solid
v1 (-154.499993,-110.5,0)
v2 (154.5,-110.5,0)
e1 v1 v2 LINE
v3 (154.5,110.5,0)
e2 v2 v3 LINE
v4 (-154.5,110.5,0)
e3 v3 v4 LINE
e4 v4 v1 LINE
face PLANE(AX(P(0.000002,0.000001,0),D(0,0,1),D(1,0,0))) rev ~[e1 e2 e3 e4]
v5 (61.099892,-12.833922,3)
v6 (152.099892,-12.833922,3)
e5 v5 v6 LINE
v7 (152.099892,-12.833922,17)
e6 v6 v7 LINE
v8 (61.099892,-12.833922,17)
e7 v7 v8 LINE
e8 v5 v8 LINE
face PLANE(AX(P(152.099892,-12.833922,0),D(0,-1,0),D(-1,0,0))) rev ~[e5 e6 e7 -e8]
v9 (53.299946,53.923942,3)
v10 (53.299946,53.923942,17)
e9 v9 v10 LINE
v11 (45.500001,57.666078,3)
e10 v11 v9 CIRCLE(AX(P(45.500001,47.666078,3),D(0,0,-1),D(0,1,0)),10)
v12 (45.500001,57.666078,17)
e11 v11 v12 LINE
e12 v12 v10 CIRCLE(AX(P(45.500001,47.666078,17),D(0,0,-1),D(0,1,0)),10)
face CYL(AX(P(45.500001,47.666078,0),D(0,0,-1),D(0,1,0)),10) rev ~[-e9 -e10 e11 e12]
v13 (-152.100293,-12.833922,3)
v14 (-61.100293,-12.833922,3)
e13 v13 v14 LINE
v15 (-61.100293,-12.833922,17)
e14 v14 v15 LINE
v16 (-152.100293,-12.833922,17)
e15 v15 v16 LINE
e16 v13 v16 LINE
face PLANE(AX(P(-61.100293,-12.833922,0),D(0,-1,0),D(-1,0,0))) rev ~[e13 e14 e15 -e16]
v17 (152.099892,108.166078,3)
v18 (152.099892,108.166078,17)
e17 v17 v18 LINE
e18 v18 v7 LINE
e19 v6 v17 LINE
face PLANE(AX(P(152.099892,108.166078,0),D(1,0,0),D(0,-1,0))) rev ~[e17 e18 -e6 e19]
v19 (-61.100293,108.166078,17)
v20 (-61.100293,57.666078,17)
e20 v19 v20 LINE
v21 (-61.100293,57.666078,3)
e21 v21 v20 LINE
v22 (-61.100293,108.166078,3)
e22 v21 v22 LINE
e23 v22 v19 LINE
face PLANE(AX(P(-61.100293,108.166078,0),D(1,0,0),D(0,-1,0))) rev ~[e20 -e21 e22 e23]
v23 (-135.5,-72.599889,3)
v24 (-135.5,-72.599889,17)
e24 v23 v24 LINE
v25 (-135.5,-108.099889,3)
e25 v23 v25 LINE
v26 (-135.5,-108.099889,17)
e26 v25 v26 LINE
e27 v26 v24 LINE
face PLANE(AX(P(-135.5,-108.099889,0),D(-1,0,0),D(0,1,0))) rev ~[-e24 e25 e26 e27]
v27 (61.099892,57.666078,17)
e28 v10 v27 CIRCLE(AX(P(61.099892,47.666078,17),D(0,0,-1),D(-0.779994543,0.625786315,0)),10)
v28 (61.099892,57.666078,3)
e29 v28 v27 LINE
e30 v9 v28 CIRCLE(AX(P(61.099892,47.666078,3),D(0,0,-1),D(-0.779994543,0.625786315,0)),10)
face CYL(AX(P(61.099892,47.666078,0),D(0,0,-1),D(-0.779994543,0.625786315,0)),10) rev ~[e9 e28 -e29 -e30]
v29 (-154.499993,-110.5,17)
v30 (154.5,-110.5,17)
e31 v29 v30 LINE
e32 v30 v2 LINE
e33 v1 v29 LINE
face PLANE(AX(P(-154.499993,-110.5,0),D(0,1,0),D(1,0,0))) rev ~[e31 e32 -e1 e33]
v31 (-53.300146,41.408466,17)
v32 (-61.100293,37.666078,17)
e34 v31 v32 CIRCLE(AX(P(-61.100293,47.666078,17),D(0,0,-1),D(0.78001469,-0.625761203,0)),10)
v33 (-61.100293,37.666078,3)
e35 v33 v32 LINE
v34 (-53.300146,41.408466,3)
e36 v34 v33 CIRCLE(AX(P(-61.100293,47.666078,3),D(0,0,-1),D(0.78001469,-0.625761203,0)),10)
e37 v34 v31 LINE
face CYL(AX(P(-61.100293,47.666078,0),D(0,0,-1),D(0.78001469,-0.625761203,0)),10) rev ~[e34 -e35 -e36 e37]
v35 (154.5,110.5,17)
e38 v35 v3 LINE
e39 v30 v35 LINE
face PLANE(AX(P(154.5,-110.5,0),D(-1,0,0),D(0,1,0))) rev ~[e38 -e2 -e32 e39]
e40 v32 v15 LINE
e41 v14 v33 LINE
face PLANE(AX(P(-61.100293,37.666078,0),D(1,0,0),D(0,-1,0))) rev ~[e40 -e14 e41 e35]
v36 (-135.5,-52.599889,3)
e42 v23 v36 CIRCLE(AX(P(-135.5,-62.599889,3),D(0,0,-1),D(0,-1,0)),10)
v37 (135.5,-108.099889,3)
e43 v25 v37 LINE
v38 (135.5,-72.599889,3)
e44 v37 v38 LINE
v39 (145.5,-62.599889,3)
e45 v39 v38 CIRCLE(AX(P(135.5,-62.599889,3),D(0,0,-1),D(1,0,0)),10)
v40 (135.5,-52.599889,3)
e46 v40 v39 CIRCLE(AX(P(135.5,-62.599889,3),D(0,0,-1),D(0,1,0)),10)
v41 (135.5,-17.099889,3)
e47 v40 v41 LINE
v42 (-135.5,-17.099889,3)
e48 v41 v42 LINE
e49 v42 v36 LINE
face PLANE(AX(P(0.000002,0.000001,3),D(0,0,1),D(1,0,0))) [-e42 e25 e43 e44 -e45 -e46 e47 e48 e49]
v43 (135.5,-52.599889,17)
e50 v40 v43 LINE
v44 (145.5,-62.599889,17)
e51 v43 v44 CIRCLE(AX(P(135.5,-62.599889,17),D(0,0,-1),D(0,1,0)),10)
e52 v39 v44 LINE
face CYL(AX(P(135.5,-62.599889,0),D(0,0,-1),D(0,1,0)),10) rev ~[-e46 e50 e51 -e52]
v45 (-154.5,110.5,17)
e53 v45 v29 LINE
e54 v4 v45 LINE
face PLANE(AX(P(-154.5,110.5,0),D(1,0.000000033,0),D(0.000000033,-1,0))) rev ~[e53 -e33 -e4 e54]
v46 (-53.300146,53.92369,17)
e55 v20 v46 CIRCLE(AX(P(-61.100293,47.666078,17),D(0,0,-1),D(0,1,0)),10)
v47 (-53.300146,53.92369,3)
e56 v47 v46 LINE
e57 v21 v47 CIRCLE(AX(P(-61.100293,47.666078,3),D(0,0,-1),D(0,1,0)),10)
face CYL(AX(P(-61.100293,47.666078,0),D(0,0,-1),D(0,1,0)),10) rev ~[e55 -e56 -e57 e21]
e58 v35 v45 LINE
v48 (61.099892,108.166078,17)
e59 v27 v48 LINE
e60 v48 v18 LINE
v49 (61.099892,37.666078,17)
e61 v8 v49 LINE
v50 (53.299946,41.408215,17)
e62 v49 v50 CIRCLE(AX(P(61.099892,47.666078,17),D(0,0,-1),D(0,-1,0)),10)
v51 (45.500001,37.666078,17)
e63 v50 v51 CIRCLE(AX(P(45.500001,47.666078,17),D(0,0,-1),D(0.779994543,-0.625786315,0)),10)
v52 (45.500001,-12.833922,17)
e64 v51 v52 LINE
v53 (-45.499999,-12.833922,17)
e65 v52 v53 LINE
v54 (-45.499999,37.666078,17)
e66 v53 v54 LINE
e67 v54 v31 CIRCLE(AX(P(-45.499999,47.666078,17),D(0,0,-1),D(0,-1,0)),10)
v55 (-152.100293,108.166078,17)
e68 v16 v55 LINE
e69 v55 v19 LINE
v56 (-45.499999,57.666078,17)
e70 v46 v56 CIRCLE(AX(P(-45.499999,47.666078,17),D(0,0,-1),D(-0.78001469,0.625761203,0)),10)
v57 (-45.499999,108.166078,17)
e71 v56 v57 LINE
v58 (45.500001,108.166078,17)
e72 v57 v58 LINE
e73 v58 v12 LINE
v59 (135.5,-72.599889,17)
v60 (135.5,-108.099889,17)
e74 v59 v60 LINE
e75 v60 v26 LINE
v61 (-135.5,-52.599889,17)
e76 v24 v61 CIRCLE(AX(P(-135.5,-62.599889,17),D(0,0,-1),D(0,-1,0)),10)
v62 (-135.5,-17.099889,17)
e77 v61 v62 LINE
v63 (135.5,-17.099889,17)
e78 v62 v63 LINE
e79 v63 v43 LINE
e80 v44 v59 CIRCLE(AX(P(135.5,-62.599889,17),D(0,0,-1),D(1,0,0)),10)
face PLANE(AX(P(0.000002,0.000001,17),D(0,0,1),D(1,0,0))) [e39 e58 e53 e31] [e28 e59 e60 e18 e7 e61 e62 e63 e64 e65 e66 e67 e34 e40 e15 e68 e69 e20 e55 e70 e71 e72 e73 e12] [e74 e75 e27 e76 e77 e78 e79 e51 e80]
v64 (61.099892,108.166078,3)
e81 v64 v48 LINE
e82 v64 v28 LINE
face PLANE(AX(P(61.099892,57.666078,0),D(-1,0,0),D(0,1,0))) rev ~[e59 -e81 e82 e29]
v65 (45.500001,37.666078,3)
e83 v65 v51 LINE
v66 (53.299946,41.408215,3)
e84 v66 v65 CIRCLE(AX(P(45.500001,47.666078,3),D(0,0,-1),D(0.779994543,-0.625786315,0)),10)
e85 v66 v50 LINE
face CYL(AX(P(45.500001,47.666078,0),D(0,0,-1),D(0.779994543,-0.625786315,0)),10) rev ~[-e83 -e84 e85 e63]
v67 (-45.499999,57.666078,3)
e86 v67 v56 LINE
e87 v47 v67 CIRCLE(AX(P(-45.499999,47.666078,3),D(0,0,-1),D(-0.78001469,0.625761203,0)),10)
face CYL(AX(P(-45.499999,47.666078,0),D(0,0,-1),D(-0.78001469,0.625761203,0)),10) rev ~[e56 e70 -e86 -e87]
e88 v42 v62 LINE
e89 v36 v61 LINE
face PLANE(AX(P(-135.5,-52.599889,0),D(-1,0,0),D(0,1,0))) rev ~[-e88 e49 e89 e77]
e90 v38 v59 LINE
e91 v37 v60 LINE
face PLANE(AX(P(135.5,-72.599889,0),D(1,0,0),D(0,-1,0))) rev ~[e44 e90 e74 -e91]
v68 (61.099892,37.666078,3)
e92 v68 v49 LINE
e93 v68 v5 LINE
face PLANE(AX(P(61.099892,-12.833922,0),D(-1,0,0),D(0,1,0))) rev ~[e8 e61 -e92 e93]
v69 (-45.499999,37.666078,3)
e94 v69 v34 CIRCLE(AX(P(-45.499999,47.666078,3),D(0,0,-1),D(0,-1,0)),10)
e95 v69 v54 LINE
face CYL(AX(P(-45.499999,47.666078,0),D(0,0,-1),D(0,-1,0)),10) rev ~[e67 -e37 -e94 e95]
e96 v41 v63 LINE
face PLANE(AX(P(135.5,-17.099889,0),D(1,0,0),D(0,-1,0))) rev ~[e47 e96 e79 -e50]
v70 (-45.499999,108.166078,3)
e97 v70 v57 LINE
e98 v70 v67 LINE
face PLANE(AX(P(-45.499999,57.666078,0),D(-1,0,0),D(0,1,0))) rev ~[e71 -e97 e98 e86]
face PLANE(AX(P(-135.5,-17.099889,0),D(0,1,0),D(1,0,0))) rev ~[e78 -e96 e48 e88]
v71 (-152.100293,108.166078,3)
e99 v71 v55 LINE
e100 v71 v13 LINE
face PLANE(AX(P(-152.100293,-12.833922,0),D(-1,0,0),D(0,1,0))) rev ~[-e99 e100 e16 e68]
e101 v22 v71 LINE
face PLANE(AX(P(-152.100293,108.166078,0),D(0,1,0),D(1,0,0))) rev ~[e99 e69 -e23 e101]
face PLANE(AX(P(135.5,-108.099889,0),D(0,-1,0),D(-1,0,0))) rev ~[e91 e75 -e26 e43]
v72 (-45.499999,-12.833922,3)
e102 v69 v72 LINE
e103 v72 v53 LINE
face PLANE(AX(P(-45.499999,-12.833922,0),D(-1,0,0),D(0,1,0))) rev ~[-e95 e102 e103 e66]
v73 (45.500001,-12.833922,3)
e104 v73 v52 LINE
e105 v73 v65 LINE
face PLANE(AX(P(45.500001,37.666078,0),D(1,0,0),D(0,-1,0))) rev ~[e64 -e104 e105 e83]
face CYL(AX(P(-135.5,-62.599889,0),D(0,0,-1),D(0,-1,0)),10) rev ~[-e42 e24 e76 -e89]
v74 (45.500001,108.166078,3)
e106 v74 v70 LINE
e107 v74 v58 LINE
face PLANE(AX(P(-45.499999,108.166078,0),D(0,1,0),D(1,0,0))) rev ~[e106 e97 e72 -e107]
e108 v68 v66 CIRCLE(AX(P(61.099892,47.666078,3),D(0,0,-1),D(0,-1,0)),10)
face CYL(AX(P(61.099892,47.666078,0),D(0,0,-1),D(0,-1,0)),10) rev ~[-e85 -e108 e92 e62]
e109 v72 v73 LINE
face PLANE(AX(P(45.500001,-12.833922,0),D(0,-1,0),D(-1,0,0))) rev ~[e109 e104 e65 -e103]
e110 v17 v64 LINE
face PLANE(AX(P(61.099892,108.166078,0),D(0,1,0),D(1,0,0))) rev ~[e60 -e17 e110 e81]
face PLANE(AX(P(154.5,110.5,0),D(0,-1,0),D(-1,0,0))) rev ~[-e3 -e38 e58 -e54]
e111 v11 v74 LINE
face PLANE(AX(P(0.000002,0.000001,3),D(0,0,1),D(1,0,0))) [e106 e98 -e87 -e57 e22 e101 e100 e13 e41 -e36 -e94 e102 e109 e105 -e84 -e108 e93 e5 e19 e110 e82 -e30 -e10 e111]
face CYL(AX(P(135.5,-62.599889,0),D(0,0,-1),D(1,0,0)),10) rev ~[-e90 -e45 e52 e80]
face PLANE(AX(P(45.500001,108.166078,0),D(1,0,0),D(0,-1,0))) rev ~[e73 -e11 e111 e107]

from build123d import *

# Parameters (mm, degrees)
F1_DEPTH = 3
F2_DEPTH = 17


# Not quite as in the source:
# - ends of sketch curves that miss each other by under 0.0002 mm in the source are joined


with BuildPart() as f1:
    # F0 (on Top) → F1 (new body)
    with BuildSketch(Plane.XY):
        Polygon((154.5, 110.5), (-154.5, 110.5), (-154.4999927282, -110.5), (154.5, -110.5), align=None)
        with BuildLine():
            Line((135.5, -108.0998892117), (-135.5, -108.0998892117))
            Line((-135.5, -108.0998892117), (-135.5, -72.5998892117))
            ThreePointArc((-135.5, -72.5998892117), (-145.5, -62.5998892117), (-135.5, -52.5998892117))
            Line((-135.5, -52.5998892117), (-135.5, -17.0998892117))
            Line((-135.5, -17.0998892117), (135.5, -17.0998892117))
            Line((135.5, -17.0998892117), (135.5, -52.5998892117))
            ThreePointArc((135.5, -52.5998892117), (142.5710678119, -55.5288213998), (145.5, -62.5998892117))
            ThreePointArc((145.5, -62.5998892117), (142.5710678119, -69.6709570235), (135.5, -72.5998892117))
            Line((135.5, -72.5998892117), (135.5, -108.0998892117))
        make_face(mode=Mode.SUBTRACT)
        with BuildLine():
            Line((-45.4999990761, 57.6660784096), (-45.4999990761, 108.1660784096))
            Line((-45.4999990761, 108.1660784096), (45.5000009239, 108.1660784096))
            Line((45.5000009239, 108.1660784096), (45.5000009239, 57.6660784096))
            ThreePointArc((45.5000009239, 57.6660784096), (49.8255857676, 56.6821371804), (53.2999463577, 53.9239415616))
            ThreePointArc((53.2999463577, 53.9239415616), (56.7743069478, 56.6821371804), (61.0998917915, 57.6660784096))
            Line((61.0998917915, 57.6660784096), (61.0998917915, 108.1660784096))
            Line((61.0998917915, 108.1660784096), (152.0998917915, 108.1660784096))
            Line((152.0998917915, 108.1660784096), (152.0998917915, -12.8339215904))
            Line((152.0998917915, -12.8339215904), (61.0998917915, -12.8339215904))
            Line((61.0998917915, -12.8339215904), (61.0998917915, 37.6660784096))
            ThreePointArc((61.0998917915, 37.6660784096), (56.7743069478, 38.6500196387), (53.2999463577, 41.4082152575))
            ThreePointArc((53.2999463577, 41.4082152575), (49.8255857676, 38.6500196387), (45.5000009239, 37.6660784096))
            Line((45.5000009239, 37.6660784096), (45.5000009239, -12.8339215904))
            Line((45.5000009239, -12.8339215904), (-45.4999990761, -12.8339215904))
            Line((-45.4999990761, -12.8339215904), (-45.4999990761, 37.6660784096))
            ThreePointArc((-45.4999990761, 37.6660784096), (-49.8257290565, 38.6500892715), (-53.3001459795, 41.4084663822))
            ThreePointArc((-53.3001459795, 41.4084663822), (-56.7745629026, 38.6500892715), (-61.1002928829, 37.6660784096))
            Line((-61.1002928829, 37.6660784096), (-61.1002928829, -12.8339215904))
            Line((-61.1002928829, -12.8339215904), (-152.1002928829, -12.8339215904))
            Line((-152.1002928829, -12.8339215904), (-152.1002928829, 108.1660784096))
            Line((-152.1002928829, 108.1660784096), (-61.1002928829, 108.1660784096))
            Line((-61.1002928829, 108.1660784096), (-61.1002928829, 57.6660784096))
            ThreePointArc((-61.1002928829, 57.6660784096), (-56.7745629026, 56.6820675476), (-53.3001459795, 53.923690437))
            ThreePointArc((-53.3001459795, 53.923690437), (-49.8257290565, 56.6820675476), (-45.4999990761, 57.6660784096))
        make_face(mode=Mode.SUBTRACT)
        with BuildLine():
            Line((-135.5, -72.5998892117), (-135.5, -108.0998892117))
            Line((-135.5, -108.0998892117), (135.5, -108.0998892117))
            Line((135.5, -108.0998892117), (135.5, -72.5998892117))
            ThreePointArc((135.5, -72.5998892117), (125.5, -62.5998892117), (135.5, -52.5998892117))
            Line((135.5, -52.5998892117), (135.5, -17.0998892117))
            Line((135.5, -17.0998892117), (-135.5, -17.0998892117))
            Line((-135.5, -17.0998892117), (-135.5, -52.5998892117))
            ThreePointArc((-135.5, -52.5998892117), (-128.4289321881, -55.5288213998), (-125.5, -62.5998892117))
            ThreePointArc((-125.5, -62.5998892117), (-128.4289321881, -69.6709570235), (-135.5, -72.5998892117))
        make_face()
        with BuildLine():
            ThreePointArc((-61.1002928829, 37.6660784096), (-71.1002928829, 47.6660784096), (-61.1002928829, 57.6660784096))
            Line((-61.1002928829, 57.6660784096), (-61.1002928829, 108.1660784096))
            Line((-61.1002928829, 108.1660784096), (-152.1002928829, 108.1660784096))
            Line((-152.1002928829, 108.1660784096), (-152.1002928829, -12.8339215904))
            Line((-152.1002928829, -12.8339215904), (-61.1002928829, -12.8339215904))
            Line((-61.1002928829, -12.8339215904), (-61.1002928829, 37.6660784096))
        make_face()
        with BuildLine():
            Line((61.0998917915, 108.1660784096), (61.0998917915, 57.6660784096))
            ThreePointArc((61.0998917915, 57.6660784096), (68.1709596034, 54.7371462214), (71.0998917915, 47.6660784096))
            ThreePointArc((71.0998917915, 47.6660784096), (68.1709596034, 40.5950105977), (61.0998917915, 37.6660784096))
            Line((61.0998917915, 37.6660784096), (61.0998917915, -12.8339215904))
            Line((61.0998917915, -12.8339215904), (152.0998917915, -12.8339215904))
            Line((152.0998917915, -12.8339215904), (152.0998917915, 108.1660784096))
            Line((152.0998917915, 108.1660784096), (61.0998917915, 108.1660784096))
        make_face()
        with BuildLine():
            Line((45.5000009239, 108.1660784096), (-45.4999990761, 108.1660784096))
            Line((-45.4999990761, 108.1660784096), (-45.4999990761, 57.6660784096))
            ThreePointArc((-45.4999990761, 57.6660784096), (-38.4289312643, 54.7371462214), (-35.4999990761, 47.6660784096))
            ThreePointArc((-35.4999990761, 47.6660784096), (-38.4289312643, 40.5950105977), (-45.4999990761, 37.6660784096))
            Line((-45.4999990761, 37.6660784096), (-45.4999990761, -12.8339215904))
            Line((-45.4999990761, -12.8339215904), (45.5000009239, -12.8339215904))
            Line((45.5000009239, -12.8339215904), (45.5000009239, 37.6660784096))
            ThreePointArc((45.5000009239, 37.6660784096), (35.5000009239, 47.6660784096), (45.5000009239, 57.6660784096))
            Line((45.5000009239, 57.6660784096), (45.5000009239, 108.1660784096))
        make_face()
        with BuildLine():
            Line((-61.1002928829, 37.6660784096), (-61.1002928829, 57.6660784096))
            ThreePointArc((-61.1002928829, 57.6660784096), (-71.1002928829, 47.6660784096), (-61.1002928829, 37.6660784096))
        make_face()
        with BuildLine():
            Line((45.5000009239, 37.6660784096), (45.5000009239, 57.6660784096))
            ThreePointArc((45.5000009239, 57.6660784096), (35.5000009239, 47.6660784096), (45.5000009239, 37.6660784096))
        make_face()
        with BuildLine():
            ThreePointArc((71.0998917915, 47.6660784096), (68.1709596034, 54.7371462214), (61.0998917915, 57.6660784096))
            Line((61.0998917915, 57.6660784096), (61.0998917915, 37.6660784096))
            ThreePointArc((61.0998917915, 37.6660784096), (68.1709596034, 40.5950105977), (71.0998917915, 47.6660784096))
        make_face()
        with BuildLine():
            Line((135.5, -52.5998892117), (135.5, -72.5998892117))
            ThreePointArc((135.5, -72.5998892117), (142.5710678119, -69.6709570235), (145.5, -62.5998892117))
            ThreePointArc((145.5, -62.5998892117), (142.5710678119, -55.5288213998), (135.5, -52.5998892117))
        make_face()
        with BuildLine():
            ThreePointArc((-35.4999990761, 47.6660784096), (-38.4289312643, 54.7371462214), (-45.4999990761, 57.6660784096))
            Line((-45.4999990761, 57.6660784096), (-45.4999990761, 37.6660784096))
            ThreePointArc((-45.4999990761, 37.6660784096), (-38.4289312643, 40.5950105977), (-35.4999990761, 47.6660784096))
        make_face()
        with BuildLine():
            ThreePointArc((135.5, -52.5998892117), (125.5, -62.5998892117), (135.5, -72.5998892117))
            Line((135.5, -72.5998892117), (135.5, -52.5998892117))
        make_face()
        with BuildLine():
            Line((-135.5, -52.5998892117), (-135.5, -72.5998892117))
            ThreePointArc((-135.5, -72.5998892117), (-128.4289321881, -69.6709570235), (-125.5, -62.5998892117))
            ThreePointArc((-125.5, -62.5998892117), (-128.4289321881, -55.5288213998), (-135.5, -52.5998892117))
        make_face()
        with BuildLine():
            ThreePointArc((-135.5, -52.5998892117), (-145.5, -62.5998892117), (-135.5, -72.5998892117))
            Line((-135.5, -72.5998892117), (-135.5, -52.5998892117))
        make_face()
        with BuildLine():
            Line((-45.4999990761, 37.6660784096), (-45.4999990761, 57.6660784096))
            ThreePointArc((-45.4999990761, 57.6660784096), (-49.8257290565, 56.6820675476), (-53.3001459795, 53.923690437))
            ThreePointArc((-53.3001459795, 53.923690437), (-51.6662728216, 50.9825924655), (-51.1002928829, 47.6660784096))
            ThreePointArc((-51.1002928829, 47.6660784096), (-51.6662728216, 44.3495643536), (-53.3001459795, 41.4084663822))
            ThreePointArc((-53.3001459795, 41.4084663822), (-49.8257290565, 38.6500892715), (-45.4999990761, 37.6660784096))
        make_face()
        with BuildLine():
            ThreePointArc((-53.3001459795, 41.4084663822), (-55.4999990761, 47.6660784096), (-53.3001459795, 53.923690437))
            ThreePointArc((-53.3001459795, 53.923690437), (-56.7745629026, 56.6820675476), (-61.1002928829, 57.6660784096))
            Line((-61.1002928829, 57.6660784096), (-61.1002928829, 37.6660784096))
            ThreePointArc((-61.1002928829, 37.6660784096), (-56.7745629026, 38.6500892715), (-53.3001459795, 41.4084663822))
        make_face()
        with BuildLine():
            ThreePointArc((61.0998917915, 57.6660784096), (56.7743069478, 56.6821371804), (53.2999463577, 53.9239415616))
            ThreePointArc((53.2999463577, 53.9239415616), (54.9339675959, 50.9827443305), (55.5000009239, 47.6660784096))
            ThreePointArc((55.5000009239, 47.6660784096), (54.9339675959, 44.3494124887), (53.2999463577, 41.4082152575))
            ThreePointArc((53.2999463577, 41.4082152575), (56.7743069478, 38.6500196387), (61.0998917915, 37.6660784096))
            Line((61.0998917915, 37.6660784096), (61.0998917915, 57.6660784096))
        make_face()
        with BuildLine():
            ThreePointArc((53.2999463577, 53.9239415616), (49.8255857676, 56.6821371804), (45.5000009239, 57.6660784096))
            Line((45.5000009239, 57.6660784096), (45.5000009239, 37.6660784096))
            ThreePointArc((45.5000009239, 37.6660784096), (49.8255857676, 38.6500196387), (53.2999463577, 41.4082152575))
            ThreePointArc((53.2999463577, 41.4082152575), (51.0998917915, 47.6660784096), (53.2999463577, 53.9239415616))
        make_face()
        with BuildLine():
            ThreePointArc((55.5000009239, 47.6660784096), (54.9339675959, 50.9827443305), (53.2999463577, 53.9239415616))
            ThreePointArc((53.2999463577, 53.9239415616), (51.0998917915, 47.6660784096), (53.2999463577, 41.4082152575))
            ThreePointArc((53.2999463577, 41.4082152575), (54.9339675959, 44.3494124887), (55.5000009239, 47.6660784096))
        make_face()
        with BuildLine():
            ThreePointArc((-51.1002928829, 47.6660784096), (-51.6662728216, 50.9825924655), (-53.3001459795, 53.923690437))
            ThreePointArc((-53.3001459795, 53.923690437), (-55.4999990761, 47.6660784096), (-53.3001459795, 41.4084663822))
            ThreePointArc((-53.3001459795, 41.4084663822), (-51.6662728216, 44.3495643536), (-51.1002928829, 47.6660784096))
        make_face()
    extrude(amount=F1_DEPTH)

    # F0 (on Top) → F2 (join)
    with BuildSketch(Plane.XY):
        Polygon((154.5, 110.5), (-154.5, 110.5), (-154.4999927282, -110.5), (154.5, -110.5), align=None)
        with BuildLine():
            Line((135.5, -108.0998892117), (-135.5, -108.0998892117))
            Line((-135.5, -108.0998892117), (-135.5, -72.5998892117))
            ThreePointArc((-135.5, -72.5998892117), (-145.5, -62.5998892117), (-135.5, -52.5998892117))
            Line((-135.5, -52.5998892117), (-135.5, -17.0998892117))
            Line((-135.5, -17.0998892117), (135.5, -17.0998892117))
            Line((135.5, -17.0998892117), (135.5, -52.5998892117))
            ThreePointArc((135.5, -52.5998892117), (142.5710678119, -55.5288213998), (145.5, -62.5998892117))
            ThreePointArc((145.5, -62.5998892117), (142.5710678119, -69.6709570235), (135.5, -72.5998892117))
            Line((135.5, -72.5998892117), (135.5, -108.0998892117))
        make_face(mode=Mode.SUBTRACT)
        with BuildLine():
            Line((-45.4999990761, 57.6660784096), (-45.4999990761, 108.1660784096))
            Line((-45.4999990761, 108.1660784096), (45.5000009239, 108.1660784096))
            Line((45.5000009239, 108.1660784096), (45.5000009239, 57.6660784096))
            ThreePointArc((45.5000009239, 57.6660784096), (49.8255857676, 56.6821371804), (53.2999463577, 53.9239415616))
            ThreePointArc((53.2999463577, 53.9239415616), (56.7743069478, 56.6821371804), (61.0998917915, 57.6660784096))
            Line((61.0998917915, 57.6660784096), (61.0998917915, 108.1660784096))
            Line((61.0998917915, 108.1660784096), (152.0998917915, 108.1660784096))
            Line((152.0998917915, 108.1660784096), (152.0998917915, -12.8339215904))
            Line((152.0998917915, -12.8339215904), (61.0998917915, -12.8339215904))
            Line((61.0998917915, -12.8339215904), (61.0998917915, 37.6660784096))
            ThreePointArc((61.0998917915, 37.6660784096), (56.7743069478, 38.6500196387), (53.2999463577, 41.4082152575))
            ThreePointArc((53.2999463577, 41.4082152575), (49.8255857676, 38.6500196387), (45.5000009239, 37.6660784096))
            Line((45.5000009239, 37.6660784096), (45.5000009239, -12.8339215904))
            Line((45.5000009239, -12.8339215904), (-45.4999990761, -12.8339215904))
            Line((-45.4999990761, -12.8339215904), (-45.4999990761, 37.6660784096))
            ThreePointArc((-45.4999990761, 37.6660784096), (-49.8257290565, 38.6500892715), (-53.3001459795, 41.4084663822))
            ThreePointArc((-53.3001459795, 41.4084663822), (-56.7745629026, 38.6500892715), (-61.1002928829, 37.6660784096))
            Line((-61.1002928829, 37.6660784096), (-61.1002928829, -12.8339215904))
            Line((-61.1002928829, -12.8339215904), (-152.1002928829, -12.8339215904))
            Line((-152.1002928829, -12.8339215904), (-152.1002928829, 108.1660784096))
            Line((-152.1002928829, 108.1660784096), (-61.1002928829, 108.1660784096))
            Line((-61.1002928829, 108.1660784096), (-61.1002928829, 57.6660784096))
            ThreePointArc((-61.1002928829, 57.6660784096), (-56.7745629026, 56.6820675476), (-53.3001459795, 53.923690437))
            ThreePointArc((-53.3001459795, 53.923690437), (-49.8257290565, 56.6820675476), (-45.4999990761, 57.6660784096))
        make_face(mode=Mode.SUBTRACT)
    extrude(amount=F2_DEPTH)


solid = f1.part
